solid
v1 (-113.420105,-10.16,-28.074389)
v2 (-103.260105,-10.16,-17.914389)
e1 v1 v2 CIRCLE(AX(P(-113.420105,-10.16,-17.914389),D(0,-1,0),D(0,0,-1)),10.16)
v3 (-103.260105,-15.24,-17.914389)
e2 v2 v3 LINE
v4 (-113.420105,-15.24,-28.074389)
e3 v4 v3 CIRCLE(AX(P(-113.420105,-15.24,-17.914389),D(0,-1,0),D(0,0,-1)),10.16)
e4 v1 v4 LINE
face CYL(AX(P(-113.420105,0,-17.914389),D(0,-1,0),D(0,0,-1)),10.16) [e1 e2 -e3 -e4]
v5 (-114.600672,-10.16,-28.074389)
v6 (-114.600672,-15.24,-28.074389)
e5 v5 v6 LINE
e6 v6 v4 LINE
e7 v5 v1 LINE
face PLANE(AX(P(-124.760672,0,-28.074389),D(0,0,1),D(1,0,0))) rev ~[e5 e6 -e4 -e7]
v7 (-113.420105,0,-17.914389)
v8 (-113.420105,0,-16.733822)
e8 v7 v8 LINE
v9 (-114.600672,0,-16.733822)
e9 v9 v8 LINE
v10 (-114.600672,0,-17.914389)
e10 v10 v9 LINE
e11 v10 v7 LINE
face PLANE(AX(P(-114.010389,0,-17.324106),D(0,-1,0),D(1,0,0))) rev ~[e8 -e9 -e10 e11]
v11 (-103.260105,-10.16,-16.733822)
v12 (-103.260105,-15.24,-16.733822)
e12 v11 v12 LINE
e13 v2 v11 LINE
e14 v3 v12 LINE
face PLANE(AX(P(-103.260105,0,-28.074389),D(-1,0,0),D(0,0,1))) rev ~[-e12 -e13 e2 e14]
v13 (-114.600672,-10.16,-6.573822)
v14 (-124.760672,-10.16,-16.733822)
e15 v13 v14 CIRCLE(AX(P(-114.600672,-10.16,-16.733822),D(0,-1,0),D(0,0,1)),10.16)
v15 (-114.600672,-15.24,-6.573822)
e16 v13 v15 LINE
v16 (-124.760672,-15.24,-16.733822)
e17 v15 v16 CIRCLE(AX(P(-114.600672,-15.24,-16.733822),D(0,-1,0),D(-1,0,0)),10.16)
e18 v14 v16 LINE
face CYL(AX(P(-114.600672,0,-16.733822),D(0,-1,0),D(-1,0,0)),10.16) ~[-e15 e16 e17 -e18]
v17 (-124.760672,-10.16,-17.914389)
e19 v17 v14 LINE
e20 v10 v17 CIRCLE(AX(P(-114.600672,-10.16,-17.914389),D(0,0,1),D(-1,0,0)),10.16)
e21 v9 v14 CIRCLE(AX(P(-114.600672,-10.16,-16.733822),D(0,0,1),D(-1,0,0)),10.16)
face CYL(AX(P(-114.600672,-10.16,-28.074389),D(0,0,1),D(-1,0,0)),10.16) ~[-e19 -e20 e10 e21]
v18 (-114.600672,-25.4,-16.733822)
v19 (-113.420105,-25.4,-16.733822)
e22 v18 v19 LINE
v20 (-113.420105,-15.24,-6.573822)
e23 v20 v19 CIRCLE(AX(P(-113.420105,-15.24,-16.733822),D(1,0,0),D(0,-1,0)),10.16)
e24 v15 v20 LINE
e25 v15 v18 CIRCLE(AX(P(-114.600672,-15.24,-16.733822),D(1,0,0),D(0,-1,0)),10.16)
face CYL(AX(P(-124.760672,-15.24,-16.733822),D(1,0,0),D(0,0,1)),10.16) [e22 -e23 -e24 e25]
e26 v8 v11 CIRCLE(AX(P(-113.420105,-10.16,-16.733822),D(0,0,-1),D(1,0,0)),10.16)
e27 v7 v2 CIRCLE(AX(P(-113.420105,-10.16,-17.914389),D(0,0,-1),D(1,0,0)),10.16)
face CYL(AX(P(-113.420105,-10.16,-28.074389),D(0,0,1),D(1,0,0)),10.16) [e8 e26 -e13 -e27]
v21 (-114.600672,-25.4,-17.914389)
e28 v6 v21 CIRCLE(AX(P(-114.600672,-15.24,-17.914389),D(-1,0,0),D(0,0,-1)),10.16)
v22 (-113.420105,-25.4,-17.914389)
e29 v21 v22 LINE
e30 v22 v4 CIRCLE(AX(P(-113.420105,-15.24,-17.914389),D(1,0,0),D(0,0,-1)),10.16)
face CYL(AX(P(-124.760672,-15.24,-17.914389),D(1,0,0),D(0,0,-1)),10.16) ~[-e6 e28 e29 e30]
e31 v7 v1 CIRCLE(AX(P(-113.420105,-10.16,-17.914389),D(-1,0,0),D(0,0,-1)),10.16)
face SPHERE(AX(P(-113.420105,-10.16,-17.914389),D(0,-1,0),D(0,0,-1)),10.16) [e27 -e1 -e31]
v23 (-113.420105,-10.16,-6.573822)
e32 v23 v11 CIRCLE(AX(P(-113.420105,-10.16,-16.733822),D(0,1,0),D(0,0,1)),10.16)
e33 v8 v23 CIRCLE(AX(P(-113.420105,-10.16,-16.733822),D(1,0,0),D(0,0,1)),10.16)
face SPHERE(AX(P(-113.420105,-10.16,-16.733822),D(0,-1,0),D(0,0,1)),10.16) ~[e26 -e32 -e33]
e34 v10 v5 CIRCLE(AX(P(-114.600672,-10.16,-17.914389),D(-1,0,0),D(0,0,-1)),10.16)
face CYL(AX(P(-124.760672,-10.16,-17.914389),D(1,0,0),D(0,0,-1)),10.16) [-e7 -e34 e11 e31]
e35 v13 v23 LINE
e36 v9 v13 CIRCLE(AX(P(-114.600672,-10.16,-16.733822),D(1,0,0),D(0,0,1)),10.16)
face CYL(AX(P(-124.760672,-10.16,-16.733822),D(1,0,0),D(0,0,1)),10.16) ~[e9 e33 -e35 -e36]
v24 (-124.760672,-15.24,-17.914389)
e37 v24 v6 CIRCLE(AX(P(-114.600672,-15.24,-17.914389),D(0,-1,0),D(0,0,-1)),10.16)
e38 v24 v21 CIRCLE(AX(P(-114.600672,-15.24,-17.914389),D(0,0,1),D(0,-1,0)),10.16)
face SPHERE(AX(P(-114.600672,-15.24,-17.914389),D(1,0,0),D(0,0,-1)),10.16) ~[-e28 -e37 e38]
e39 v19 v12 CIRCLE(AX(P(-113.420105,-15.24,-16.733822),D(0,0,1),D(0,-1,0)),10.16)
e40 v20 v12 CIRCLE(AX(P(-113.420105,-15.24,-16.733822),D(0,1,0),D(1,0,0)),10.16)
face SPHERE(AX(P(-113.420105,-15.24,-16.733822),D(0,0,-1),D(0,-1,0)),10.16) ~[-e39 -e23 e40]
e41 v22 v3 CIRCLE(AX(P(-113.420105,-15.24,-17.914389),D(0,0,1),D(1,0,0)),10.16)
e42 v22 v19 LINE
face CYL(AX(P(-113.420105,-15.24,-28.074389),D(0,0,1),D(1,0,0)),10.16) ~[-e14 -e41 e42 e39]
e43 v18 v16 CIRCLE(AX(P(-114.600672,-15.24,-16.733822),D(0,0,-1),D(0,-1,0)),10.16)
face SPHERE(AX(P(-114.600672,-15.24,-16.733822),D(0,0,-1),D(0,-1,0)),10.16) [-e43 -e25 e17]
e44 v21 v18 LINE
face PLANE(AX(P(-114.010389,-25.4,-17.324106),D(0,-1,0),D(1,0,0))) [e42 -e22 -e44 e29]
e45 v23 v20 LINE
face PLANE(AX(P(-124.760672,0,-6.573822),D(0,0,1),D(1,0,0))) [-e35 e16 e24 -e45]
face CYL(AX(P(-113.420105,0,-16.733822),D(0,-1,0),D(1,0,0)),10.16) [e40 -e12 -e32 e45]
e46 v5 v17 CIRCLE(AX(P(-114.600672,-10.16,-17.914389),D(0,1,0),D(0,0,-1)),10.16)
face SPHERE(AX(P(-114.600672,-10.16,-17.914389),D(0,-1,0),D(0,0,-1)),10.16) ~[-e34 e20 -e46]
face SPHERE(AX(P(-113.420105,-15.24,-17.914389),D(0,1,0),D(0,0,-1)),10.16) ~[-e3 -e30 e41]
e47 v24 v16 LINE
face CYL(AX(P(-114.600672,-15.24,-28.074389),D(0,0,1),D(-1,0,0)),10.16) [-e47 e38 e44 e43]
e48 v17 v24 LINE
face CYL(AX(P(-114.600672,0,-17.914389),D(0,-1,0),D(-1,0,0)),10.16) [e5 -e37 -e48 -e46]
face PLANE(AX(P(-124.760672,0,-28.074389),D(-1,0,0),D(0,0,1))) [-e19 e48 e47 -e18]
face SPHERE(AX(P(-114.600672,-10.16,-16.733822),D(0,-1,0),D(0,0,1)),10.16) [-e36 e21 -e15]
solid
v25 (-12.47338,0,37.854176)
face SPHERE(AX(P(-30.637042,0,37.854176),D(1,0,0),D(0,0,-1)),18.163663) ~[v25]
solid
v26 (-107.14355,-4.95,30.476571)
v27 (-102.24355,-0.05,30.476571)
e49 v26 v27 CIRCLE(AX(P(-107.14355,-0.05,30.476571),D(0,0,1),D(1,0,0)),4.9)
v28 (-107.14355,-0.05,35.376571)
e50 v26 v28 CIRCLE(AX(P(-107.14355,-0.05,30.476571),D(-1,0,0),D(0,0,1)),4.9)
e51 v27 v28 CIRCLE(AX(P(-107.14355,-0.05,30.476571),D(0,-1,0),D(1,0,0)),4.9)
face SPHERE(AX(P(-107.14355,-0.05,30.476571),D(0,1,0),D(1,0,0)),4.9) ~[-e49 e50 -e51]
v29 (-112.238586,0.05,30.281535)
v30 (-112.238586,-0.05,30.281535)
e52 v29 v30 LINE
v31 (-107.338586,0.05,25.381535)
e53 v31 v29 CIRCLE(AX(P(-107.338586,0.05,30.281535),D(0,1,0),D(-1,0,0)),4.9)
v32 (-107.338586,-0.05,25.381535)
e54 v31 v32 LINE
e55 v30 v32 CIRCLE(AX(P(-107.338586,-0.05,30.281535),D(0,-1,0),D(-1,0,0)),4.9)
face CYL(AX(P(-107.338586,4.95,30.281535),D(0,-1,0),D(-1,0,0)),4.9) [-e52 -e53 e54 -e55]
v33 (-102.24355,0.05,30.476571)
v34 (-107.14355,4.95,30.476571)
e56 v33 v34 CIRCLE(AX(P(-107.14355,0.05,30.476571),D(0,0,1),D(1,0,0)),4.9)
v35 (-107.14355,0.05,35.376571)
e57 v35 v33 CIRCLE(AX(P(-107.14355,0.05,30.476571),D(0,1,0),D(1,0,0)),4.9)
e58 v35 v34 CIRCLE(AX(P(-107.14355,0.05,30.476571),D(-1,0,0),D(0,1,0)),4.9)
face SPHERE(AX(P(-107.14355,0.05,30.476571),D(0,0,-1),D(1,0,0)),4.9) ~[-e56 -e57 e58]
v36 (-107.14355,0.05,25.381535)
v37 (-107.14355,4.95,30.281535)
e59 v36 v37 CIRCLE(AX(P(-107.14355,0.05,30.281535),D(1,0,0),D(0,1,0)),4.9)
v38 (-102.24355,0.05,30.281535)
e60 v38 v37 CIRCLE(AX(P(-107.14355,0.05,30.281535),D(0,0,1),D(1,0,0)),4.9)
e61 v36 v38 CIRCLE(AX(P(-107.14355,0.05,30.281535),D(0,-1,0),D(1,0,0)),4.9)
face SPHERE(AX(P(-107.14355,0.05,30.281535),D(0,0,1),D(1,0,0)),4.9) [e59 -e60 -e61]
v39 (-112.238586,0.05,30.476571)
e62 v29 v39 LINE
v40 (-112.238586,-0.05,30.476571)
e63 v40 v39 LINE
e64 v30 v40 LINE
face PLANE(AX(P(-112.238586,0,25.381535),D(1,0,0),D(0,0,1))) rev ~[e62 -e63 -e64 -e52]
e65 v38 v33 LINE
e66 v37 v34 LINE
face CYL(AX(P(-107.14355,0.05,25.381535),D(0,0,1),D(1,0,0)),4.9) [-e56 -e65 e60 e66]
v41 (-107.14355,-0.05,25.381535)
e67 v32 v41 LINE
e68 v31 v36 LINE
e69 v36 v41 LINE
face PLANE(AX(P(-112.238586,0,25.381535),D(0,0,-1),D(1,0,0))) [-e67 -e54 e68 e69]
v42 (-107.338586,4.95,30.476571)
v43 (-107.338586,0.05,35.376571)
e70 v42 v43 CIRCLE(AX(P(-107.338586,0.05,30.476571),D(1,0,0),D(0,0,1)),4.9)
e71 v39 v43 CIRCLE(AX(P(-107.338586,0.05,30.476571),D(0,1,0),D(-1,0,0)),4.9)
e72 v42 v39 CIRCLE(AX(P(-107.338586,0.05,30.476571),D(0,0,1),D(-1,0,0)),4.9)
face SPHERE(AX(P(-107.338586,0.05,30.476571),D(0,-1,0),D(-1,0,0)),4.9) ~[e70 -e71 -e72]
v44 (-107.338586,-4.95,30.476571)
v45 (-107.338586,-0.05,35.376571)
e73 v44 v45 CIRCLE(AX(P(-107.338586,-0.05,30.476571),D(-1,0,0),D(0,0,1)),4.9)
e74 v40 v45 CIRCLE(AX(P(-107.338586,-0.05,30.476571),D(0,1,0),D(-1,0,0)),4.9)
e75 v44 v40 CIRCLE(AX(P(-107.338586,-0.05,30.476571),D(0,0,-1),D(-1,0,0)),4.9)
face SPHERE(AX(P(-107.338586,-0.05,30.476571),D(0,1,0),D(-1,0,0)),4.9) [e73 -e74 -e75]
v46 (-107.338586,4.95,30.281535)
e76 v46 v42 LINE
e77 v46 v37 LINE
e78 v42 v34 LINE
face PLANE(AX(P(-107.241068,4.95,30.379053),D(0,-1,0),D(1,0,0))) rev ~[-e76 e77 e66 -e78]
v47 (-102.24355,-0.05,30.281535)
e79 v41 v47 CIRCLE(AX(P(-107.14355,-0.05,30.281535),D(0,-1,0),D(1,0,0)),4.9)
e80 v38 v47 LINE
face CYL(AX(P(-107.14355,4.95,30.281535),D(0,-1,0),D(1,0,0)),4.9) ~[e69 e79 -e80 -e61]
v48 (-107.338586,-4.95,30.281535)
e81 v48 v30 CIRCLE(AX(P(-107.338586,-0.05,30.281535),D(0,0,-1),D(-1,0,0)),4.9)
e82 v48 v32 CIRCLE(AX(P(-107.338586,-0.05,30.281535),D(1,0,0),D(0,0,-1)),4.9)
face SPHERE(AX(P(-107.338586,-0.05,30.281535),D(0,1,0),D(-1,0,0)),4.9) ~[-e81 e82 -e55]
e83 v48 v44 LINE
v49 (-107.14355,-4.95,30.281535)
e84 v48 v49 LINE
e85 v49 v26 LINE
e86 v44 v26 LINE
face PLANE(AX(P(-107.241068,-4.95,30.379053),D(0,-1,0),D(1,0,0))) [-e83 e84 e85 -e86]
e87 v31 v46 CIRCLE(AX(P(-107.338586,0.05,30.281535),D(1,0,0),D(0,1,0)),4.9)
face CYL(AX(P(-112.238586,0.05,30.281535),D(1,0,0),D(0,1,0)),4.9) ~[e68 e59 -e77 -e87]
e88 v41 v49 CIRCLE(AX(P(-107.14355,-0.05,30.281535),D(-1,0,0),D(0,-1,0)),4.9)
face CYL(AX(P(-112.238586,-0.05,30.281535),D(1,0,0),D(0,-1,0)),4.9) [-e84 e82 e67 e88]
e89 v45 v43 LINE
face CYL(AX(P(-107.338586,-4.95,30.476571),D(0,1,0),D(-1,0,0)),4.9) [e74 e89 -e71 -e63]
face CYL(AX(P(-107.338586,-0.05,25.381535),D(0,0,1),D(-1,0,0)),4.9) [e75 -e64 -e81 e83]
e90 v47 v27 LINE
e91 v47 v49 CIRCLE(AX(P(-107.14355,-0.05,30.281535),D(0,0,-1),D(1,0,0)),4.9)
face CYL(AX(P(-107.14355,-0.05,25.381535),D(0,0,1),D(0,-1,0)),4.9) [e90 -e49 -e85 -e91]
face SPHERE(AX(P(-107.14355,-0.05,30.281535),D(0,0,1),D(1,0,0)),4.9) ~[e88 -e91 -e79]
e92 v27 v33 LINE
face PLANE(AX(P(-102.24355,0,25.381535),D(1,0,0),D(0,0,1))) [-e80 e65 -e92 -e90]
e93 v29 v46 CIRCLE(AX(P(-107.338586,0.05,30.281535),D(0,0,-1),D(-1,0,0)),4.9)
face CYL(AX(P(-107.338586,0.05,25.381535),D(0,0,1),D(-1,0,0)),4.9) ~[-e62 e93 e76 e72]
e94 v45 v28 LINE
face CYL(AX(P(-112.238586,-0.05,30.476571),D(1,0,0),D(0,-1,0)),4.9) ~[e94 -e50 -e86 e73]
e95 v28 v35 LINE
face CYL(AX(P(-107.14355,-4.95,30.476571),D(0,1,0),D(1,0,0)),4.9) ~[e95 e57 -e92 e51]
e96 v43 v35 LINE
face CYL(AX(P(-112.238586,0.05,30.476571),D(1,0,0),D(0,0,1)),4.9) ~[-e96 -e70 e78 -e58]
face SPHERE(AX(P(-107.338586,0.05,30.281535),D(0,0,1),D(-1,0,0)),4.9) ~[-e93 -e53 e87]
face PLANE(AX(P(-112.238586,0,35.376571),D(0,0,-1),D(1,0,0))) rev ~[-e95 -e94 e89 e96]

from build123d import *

# Parameters (mm, degrees)
F1_W     = 21.5005669743
F1_H     = 21.5005669743
F2_DEPTH = 25.4
F3_R     = 10.16
F6_W     = 9.9950358272
F6_H     = 9.9950358272
F7_DEPTH = 4.95
F8_R     = 4.9


# Not quite as in the source:
# - ends of sketch curves that miss each other by under 0.0002 mm in the source are joined


with BuildPart() as f2:
    # F1 (on Front) → F2 (new body)
    with BuildSketch(Plane.XZ):
        with Locations((-114.0103889629, -17.3241058365)):
            Rectangle(F1_W, F1_H)
    extrude(amount=F2_DEPTH)

    # F3
    f3_edges = [f2.edges().sort_by_distance(p)[0] for p in [
        (-103.260105, -12.7, -28.074389),
        (-114.010389, -25.4, -28.074389),
        (-124.760672, -12.7, -28.074389),
        (-114.010389, 0, -28.074389),
        (-124.760672, -25.4, -17.324106),
        (-103.260105, -25.4, -17.324106),
        (-114.010389, -25.4, -6.573822),
        (-124.760672, -12.7, -6.573822),
        (-103.260105, -12.7, -6.573822),
        (-114.010389, 0, -6.573822),
        (-124.760672, 0, -17.324106),
        (-103.260105, 0, -17.324106),
    ]]
    fillet(f3_edges, radius=F3_R)


with BuildPart() as f5:
    # F4 (on Front) → F5 (revolve)
    with BuildSketch(Plane.XZ):
        with BuildLine():
            ThreePointArc((-48.8007047402, 37.8541760147), (-30.6370421313, 19.6905134058), (-12.4733795224, 37.8541760147))
            Line((-12.4733795224, 37.8541760147), (-48.8007047402, 37.8541760147))
        make_face()
    revolve(axis=Axis((-30.6370421313, 0, 37.8541760147), (-1, 0, 0)))


with BuildPart() as f7:
    # F6 (on Front) → F7 (new body, symmetric)
    with BuildSketch(Plane.XZ):
        with Locations((-107.2410680354, 30.3790532053)):
            Rectangle(F6_W, F6_H)
    extrude(amount=F7_DEPTH, both=True)

    # F8
    f8_edges = [f7.edges().sort_by_distance(p)[0] for p in [
        (-112.238586, 0, 35.376571),
        (-112.238586, 4.95, 30.379053),
        (-112.238586, 0, 25.381535),
        (-112.238586, -4.95, 30.379053),
        (-102.24355, 4.95, 30.379053),
        (-102.24355, 0, 35.376571),
        (-102.24355, -4.95, 30.379053),
        (-102.24355, 0, 25.381535),
        (-107.241068, 4.95, 35.376571),
        (-107.241068, 4.95, 25.381535),
        (-107.241068, -4.95, 35.376571),
        (-107.241068, -4.95, 25.381535),
    ]]
    fillet(f8_edges, radius=F8_R)


solid = Compound([f2.part, f5.part, f7.part])
